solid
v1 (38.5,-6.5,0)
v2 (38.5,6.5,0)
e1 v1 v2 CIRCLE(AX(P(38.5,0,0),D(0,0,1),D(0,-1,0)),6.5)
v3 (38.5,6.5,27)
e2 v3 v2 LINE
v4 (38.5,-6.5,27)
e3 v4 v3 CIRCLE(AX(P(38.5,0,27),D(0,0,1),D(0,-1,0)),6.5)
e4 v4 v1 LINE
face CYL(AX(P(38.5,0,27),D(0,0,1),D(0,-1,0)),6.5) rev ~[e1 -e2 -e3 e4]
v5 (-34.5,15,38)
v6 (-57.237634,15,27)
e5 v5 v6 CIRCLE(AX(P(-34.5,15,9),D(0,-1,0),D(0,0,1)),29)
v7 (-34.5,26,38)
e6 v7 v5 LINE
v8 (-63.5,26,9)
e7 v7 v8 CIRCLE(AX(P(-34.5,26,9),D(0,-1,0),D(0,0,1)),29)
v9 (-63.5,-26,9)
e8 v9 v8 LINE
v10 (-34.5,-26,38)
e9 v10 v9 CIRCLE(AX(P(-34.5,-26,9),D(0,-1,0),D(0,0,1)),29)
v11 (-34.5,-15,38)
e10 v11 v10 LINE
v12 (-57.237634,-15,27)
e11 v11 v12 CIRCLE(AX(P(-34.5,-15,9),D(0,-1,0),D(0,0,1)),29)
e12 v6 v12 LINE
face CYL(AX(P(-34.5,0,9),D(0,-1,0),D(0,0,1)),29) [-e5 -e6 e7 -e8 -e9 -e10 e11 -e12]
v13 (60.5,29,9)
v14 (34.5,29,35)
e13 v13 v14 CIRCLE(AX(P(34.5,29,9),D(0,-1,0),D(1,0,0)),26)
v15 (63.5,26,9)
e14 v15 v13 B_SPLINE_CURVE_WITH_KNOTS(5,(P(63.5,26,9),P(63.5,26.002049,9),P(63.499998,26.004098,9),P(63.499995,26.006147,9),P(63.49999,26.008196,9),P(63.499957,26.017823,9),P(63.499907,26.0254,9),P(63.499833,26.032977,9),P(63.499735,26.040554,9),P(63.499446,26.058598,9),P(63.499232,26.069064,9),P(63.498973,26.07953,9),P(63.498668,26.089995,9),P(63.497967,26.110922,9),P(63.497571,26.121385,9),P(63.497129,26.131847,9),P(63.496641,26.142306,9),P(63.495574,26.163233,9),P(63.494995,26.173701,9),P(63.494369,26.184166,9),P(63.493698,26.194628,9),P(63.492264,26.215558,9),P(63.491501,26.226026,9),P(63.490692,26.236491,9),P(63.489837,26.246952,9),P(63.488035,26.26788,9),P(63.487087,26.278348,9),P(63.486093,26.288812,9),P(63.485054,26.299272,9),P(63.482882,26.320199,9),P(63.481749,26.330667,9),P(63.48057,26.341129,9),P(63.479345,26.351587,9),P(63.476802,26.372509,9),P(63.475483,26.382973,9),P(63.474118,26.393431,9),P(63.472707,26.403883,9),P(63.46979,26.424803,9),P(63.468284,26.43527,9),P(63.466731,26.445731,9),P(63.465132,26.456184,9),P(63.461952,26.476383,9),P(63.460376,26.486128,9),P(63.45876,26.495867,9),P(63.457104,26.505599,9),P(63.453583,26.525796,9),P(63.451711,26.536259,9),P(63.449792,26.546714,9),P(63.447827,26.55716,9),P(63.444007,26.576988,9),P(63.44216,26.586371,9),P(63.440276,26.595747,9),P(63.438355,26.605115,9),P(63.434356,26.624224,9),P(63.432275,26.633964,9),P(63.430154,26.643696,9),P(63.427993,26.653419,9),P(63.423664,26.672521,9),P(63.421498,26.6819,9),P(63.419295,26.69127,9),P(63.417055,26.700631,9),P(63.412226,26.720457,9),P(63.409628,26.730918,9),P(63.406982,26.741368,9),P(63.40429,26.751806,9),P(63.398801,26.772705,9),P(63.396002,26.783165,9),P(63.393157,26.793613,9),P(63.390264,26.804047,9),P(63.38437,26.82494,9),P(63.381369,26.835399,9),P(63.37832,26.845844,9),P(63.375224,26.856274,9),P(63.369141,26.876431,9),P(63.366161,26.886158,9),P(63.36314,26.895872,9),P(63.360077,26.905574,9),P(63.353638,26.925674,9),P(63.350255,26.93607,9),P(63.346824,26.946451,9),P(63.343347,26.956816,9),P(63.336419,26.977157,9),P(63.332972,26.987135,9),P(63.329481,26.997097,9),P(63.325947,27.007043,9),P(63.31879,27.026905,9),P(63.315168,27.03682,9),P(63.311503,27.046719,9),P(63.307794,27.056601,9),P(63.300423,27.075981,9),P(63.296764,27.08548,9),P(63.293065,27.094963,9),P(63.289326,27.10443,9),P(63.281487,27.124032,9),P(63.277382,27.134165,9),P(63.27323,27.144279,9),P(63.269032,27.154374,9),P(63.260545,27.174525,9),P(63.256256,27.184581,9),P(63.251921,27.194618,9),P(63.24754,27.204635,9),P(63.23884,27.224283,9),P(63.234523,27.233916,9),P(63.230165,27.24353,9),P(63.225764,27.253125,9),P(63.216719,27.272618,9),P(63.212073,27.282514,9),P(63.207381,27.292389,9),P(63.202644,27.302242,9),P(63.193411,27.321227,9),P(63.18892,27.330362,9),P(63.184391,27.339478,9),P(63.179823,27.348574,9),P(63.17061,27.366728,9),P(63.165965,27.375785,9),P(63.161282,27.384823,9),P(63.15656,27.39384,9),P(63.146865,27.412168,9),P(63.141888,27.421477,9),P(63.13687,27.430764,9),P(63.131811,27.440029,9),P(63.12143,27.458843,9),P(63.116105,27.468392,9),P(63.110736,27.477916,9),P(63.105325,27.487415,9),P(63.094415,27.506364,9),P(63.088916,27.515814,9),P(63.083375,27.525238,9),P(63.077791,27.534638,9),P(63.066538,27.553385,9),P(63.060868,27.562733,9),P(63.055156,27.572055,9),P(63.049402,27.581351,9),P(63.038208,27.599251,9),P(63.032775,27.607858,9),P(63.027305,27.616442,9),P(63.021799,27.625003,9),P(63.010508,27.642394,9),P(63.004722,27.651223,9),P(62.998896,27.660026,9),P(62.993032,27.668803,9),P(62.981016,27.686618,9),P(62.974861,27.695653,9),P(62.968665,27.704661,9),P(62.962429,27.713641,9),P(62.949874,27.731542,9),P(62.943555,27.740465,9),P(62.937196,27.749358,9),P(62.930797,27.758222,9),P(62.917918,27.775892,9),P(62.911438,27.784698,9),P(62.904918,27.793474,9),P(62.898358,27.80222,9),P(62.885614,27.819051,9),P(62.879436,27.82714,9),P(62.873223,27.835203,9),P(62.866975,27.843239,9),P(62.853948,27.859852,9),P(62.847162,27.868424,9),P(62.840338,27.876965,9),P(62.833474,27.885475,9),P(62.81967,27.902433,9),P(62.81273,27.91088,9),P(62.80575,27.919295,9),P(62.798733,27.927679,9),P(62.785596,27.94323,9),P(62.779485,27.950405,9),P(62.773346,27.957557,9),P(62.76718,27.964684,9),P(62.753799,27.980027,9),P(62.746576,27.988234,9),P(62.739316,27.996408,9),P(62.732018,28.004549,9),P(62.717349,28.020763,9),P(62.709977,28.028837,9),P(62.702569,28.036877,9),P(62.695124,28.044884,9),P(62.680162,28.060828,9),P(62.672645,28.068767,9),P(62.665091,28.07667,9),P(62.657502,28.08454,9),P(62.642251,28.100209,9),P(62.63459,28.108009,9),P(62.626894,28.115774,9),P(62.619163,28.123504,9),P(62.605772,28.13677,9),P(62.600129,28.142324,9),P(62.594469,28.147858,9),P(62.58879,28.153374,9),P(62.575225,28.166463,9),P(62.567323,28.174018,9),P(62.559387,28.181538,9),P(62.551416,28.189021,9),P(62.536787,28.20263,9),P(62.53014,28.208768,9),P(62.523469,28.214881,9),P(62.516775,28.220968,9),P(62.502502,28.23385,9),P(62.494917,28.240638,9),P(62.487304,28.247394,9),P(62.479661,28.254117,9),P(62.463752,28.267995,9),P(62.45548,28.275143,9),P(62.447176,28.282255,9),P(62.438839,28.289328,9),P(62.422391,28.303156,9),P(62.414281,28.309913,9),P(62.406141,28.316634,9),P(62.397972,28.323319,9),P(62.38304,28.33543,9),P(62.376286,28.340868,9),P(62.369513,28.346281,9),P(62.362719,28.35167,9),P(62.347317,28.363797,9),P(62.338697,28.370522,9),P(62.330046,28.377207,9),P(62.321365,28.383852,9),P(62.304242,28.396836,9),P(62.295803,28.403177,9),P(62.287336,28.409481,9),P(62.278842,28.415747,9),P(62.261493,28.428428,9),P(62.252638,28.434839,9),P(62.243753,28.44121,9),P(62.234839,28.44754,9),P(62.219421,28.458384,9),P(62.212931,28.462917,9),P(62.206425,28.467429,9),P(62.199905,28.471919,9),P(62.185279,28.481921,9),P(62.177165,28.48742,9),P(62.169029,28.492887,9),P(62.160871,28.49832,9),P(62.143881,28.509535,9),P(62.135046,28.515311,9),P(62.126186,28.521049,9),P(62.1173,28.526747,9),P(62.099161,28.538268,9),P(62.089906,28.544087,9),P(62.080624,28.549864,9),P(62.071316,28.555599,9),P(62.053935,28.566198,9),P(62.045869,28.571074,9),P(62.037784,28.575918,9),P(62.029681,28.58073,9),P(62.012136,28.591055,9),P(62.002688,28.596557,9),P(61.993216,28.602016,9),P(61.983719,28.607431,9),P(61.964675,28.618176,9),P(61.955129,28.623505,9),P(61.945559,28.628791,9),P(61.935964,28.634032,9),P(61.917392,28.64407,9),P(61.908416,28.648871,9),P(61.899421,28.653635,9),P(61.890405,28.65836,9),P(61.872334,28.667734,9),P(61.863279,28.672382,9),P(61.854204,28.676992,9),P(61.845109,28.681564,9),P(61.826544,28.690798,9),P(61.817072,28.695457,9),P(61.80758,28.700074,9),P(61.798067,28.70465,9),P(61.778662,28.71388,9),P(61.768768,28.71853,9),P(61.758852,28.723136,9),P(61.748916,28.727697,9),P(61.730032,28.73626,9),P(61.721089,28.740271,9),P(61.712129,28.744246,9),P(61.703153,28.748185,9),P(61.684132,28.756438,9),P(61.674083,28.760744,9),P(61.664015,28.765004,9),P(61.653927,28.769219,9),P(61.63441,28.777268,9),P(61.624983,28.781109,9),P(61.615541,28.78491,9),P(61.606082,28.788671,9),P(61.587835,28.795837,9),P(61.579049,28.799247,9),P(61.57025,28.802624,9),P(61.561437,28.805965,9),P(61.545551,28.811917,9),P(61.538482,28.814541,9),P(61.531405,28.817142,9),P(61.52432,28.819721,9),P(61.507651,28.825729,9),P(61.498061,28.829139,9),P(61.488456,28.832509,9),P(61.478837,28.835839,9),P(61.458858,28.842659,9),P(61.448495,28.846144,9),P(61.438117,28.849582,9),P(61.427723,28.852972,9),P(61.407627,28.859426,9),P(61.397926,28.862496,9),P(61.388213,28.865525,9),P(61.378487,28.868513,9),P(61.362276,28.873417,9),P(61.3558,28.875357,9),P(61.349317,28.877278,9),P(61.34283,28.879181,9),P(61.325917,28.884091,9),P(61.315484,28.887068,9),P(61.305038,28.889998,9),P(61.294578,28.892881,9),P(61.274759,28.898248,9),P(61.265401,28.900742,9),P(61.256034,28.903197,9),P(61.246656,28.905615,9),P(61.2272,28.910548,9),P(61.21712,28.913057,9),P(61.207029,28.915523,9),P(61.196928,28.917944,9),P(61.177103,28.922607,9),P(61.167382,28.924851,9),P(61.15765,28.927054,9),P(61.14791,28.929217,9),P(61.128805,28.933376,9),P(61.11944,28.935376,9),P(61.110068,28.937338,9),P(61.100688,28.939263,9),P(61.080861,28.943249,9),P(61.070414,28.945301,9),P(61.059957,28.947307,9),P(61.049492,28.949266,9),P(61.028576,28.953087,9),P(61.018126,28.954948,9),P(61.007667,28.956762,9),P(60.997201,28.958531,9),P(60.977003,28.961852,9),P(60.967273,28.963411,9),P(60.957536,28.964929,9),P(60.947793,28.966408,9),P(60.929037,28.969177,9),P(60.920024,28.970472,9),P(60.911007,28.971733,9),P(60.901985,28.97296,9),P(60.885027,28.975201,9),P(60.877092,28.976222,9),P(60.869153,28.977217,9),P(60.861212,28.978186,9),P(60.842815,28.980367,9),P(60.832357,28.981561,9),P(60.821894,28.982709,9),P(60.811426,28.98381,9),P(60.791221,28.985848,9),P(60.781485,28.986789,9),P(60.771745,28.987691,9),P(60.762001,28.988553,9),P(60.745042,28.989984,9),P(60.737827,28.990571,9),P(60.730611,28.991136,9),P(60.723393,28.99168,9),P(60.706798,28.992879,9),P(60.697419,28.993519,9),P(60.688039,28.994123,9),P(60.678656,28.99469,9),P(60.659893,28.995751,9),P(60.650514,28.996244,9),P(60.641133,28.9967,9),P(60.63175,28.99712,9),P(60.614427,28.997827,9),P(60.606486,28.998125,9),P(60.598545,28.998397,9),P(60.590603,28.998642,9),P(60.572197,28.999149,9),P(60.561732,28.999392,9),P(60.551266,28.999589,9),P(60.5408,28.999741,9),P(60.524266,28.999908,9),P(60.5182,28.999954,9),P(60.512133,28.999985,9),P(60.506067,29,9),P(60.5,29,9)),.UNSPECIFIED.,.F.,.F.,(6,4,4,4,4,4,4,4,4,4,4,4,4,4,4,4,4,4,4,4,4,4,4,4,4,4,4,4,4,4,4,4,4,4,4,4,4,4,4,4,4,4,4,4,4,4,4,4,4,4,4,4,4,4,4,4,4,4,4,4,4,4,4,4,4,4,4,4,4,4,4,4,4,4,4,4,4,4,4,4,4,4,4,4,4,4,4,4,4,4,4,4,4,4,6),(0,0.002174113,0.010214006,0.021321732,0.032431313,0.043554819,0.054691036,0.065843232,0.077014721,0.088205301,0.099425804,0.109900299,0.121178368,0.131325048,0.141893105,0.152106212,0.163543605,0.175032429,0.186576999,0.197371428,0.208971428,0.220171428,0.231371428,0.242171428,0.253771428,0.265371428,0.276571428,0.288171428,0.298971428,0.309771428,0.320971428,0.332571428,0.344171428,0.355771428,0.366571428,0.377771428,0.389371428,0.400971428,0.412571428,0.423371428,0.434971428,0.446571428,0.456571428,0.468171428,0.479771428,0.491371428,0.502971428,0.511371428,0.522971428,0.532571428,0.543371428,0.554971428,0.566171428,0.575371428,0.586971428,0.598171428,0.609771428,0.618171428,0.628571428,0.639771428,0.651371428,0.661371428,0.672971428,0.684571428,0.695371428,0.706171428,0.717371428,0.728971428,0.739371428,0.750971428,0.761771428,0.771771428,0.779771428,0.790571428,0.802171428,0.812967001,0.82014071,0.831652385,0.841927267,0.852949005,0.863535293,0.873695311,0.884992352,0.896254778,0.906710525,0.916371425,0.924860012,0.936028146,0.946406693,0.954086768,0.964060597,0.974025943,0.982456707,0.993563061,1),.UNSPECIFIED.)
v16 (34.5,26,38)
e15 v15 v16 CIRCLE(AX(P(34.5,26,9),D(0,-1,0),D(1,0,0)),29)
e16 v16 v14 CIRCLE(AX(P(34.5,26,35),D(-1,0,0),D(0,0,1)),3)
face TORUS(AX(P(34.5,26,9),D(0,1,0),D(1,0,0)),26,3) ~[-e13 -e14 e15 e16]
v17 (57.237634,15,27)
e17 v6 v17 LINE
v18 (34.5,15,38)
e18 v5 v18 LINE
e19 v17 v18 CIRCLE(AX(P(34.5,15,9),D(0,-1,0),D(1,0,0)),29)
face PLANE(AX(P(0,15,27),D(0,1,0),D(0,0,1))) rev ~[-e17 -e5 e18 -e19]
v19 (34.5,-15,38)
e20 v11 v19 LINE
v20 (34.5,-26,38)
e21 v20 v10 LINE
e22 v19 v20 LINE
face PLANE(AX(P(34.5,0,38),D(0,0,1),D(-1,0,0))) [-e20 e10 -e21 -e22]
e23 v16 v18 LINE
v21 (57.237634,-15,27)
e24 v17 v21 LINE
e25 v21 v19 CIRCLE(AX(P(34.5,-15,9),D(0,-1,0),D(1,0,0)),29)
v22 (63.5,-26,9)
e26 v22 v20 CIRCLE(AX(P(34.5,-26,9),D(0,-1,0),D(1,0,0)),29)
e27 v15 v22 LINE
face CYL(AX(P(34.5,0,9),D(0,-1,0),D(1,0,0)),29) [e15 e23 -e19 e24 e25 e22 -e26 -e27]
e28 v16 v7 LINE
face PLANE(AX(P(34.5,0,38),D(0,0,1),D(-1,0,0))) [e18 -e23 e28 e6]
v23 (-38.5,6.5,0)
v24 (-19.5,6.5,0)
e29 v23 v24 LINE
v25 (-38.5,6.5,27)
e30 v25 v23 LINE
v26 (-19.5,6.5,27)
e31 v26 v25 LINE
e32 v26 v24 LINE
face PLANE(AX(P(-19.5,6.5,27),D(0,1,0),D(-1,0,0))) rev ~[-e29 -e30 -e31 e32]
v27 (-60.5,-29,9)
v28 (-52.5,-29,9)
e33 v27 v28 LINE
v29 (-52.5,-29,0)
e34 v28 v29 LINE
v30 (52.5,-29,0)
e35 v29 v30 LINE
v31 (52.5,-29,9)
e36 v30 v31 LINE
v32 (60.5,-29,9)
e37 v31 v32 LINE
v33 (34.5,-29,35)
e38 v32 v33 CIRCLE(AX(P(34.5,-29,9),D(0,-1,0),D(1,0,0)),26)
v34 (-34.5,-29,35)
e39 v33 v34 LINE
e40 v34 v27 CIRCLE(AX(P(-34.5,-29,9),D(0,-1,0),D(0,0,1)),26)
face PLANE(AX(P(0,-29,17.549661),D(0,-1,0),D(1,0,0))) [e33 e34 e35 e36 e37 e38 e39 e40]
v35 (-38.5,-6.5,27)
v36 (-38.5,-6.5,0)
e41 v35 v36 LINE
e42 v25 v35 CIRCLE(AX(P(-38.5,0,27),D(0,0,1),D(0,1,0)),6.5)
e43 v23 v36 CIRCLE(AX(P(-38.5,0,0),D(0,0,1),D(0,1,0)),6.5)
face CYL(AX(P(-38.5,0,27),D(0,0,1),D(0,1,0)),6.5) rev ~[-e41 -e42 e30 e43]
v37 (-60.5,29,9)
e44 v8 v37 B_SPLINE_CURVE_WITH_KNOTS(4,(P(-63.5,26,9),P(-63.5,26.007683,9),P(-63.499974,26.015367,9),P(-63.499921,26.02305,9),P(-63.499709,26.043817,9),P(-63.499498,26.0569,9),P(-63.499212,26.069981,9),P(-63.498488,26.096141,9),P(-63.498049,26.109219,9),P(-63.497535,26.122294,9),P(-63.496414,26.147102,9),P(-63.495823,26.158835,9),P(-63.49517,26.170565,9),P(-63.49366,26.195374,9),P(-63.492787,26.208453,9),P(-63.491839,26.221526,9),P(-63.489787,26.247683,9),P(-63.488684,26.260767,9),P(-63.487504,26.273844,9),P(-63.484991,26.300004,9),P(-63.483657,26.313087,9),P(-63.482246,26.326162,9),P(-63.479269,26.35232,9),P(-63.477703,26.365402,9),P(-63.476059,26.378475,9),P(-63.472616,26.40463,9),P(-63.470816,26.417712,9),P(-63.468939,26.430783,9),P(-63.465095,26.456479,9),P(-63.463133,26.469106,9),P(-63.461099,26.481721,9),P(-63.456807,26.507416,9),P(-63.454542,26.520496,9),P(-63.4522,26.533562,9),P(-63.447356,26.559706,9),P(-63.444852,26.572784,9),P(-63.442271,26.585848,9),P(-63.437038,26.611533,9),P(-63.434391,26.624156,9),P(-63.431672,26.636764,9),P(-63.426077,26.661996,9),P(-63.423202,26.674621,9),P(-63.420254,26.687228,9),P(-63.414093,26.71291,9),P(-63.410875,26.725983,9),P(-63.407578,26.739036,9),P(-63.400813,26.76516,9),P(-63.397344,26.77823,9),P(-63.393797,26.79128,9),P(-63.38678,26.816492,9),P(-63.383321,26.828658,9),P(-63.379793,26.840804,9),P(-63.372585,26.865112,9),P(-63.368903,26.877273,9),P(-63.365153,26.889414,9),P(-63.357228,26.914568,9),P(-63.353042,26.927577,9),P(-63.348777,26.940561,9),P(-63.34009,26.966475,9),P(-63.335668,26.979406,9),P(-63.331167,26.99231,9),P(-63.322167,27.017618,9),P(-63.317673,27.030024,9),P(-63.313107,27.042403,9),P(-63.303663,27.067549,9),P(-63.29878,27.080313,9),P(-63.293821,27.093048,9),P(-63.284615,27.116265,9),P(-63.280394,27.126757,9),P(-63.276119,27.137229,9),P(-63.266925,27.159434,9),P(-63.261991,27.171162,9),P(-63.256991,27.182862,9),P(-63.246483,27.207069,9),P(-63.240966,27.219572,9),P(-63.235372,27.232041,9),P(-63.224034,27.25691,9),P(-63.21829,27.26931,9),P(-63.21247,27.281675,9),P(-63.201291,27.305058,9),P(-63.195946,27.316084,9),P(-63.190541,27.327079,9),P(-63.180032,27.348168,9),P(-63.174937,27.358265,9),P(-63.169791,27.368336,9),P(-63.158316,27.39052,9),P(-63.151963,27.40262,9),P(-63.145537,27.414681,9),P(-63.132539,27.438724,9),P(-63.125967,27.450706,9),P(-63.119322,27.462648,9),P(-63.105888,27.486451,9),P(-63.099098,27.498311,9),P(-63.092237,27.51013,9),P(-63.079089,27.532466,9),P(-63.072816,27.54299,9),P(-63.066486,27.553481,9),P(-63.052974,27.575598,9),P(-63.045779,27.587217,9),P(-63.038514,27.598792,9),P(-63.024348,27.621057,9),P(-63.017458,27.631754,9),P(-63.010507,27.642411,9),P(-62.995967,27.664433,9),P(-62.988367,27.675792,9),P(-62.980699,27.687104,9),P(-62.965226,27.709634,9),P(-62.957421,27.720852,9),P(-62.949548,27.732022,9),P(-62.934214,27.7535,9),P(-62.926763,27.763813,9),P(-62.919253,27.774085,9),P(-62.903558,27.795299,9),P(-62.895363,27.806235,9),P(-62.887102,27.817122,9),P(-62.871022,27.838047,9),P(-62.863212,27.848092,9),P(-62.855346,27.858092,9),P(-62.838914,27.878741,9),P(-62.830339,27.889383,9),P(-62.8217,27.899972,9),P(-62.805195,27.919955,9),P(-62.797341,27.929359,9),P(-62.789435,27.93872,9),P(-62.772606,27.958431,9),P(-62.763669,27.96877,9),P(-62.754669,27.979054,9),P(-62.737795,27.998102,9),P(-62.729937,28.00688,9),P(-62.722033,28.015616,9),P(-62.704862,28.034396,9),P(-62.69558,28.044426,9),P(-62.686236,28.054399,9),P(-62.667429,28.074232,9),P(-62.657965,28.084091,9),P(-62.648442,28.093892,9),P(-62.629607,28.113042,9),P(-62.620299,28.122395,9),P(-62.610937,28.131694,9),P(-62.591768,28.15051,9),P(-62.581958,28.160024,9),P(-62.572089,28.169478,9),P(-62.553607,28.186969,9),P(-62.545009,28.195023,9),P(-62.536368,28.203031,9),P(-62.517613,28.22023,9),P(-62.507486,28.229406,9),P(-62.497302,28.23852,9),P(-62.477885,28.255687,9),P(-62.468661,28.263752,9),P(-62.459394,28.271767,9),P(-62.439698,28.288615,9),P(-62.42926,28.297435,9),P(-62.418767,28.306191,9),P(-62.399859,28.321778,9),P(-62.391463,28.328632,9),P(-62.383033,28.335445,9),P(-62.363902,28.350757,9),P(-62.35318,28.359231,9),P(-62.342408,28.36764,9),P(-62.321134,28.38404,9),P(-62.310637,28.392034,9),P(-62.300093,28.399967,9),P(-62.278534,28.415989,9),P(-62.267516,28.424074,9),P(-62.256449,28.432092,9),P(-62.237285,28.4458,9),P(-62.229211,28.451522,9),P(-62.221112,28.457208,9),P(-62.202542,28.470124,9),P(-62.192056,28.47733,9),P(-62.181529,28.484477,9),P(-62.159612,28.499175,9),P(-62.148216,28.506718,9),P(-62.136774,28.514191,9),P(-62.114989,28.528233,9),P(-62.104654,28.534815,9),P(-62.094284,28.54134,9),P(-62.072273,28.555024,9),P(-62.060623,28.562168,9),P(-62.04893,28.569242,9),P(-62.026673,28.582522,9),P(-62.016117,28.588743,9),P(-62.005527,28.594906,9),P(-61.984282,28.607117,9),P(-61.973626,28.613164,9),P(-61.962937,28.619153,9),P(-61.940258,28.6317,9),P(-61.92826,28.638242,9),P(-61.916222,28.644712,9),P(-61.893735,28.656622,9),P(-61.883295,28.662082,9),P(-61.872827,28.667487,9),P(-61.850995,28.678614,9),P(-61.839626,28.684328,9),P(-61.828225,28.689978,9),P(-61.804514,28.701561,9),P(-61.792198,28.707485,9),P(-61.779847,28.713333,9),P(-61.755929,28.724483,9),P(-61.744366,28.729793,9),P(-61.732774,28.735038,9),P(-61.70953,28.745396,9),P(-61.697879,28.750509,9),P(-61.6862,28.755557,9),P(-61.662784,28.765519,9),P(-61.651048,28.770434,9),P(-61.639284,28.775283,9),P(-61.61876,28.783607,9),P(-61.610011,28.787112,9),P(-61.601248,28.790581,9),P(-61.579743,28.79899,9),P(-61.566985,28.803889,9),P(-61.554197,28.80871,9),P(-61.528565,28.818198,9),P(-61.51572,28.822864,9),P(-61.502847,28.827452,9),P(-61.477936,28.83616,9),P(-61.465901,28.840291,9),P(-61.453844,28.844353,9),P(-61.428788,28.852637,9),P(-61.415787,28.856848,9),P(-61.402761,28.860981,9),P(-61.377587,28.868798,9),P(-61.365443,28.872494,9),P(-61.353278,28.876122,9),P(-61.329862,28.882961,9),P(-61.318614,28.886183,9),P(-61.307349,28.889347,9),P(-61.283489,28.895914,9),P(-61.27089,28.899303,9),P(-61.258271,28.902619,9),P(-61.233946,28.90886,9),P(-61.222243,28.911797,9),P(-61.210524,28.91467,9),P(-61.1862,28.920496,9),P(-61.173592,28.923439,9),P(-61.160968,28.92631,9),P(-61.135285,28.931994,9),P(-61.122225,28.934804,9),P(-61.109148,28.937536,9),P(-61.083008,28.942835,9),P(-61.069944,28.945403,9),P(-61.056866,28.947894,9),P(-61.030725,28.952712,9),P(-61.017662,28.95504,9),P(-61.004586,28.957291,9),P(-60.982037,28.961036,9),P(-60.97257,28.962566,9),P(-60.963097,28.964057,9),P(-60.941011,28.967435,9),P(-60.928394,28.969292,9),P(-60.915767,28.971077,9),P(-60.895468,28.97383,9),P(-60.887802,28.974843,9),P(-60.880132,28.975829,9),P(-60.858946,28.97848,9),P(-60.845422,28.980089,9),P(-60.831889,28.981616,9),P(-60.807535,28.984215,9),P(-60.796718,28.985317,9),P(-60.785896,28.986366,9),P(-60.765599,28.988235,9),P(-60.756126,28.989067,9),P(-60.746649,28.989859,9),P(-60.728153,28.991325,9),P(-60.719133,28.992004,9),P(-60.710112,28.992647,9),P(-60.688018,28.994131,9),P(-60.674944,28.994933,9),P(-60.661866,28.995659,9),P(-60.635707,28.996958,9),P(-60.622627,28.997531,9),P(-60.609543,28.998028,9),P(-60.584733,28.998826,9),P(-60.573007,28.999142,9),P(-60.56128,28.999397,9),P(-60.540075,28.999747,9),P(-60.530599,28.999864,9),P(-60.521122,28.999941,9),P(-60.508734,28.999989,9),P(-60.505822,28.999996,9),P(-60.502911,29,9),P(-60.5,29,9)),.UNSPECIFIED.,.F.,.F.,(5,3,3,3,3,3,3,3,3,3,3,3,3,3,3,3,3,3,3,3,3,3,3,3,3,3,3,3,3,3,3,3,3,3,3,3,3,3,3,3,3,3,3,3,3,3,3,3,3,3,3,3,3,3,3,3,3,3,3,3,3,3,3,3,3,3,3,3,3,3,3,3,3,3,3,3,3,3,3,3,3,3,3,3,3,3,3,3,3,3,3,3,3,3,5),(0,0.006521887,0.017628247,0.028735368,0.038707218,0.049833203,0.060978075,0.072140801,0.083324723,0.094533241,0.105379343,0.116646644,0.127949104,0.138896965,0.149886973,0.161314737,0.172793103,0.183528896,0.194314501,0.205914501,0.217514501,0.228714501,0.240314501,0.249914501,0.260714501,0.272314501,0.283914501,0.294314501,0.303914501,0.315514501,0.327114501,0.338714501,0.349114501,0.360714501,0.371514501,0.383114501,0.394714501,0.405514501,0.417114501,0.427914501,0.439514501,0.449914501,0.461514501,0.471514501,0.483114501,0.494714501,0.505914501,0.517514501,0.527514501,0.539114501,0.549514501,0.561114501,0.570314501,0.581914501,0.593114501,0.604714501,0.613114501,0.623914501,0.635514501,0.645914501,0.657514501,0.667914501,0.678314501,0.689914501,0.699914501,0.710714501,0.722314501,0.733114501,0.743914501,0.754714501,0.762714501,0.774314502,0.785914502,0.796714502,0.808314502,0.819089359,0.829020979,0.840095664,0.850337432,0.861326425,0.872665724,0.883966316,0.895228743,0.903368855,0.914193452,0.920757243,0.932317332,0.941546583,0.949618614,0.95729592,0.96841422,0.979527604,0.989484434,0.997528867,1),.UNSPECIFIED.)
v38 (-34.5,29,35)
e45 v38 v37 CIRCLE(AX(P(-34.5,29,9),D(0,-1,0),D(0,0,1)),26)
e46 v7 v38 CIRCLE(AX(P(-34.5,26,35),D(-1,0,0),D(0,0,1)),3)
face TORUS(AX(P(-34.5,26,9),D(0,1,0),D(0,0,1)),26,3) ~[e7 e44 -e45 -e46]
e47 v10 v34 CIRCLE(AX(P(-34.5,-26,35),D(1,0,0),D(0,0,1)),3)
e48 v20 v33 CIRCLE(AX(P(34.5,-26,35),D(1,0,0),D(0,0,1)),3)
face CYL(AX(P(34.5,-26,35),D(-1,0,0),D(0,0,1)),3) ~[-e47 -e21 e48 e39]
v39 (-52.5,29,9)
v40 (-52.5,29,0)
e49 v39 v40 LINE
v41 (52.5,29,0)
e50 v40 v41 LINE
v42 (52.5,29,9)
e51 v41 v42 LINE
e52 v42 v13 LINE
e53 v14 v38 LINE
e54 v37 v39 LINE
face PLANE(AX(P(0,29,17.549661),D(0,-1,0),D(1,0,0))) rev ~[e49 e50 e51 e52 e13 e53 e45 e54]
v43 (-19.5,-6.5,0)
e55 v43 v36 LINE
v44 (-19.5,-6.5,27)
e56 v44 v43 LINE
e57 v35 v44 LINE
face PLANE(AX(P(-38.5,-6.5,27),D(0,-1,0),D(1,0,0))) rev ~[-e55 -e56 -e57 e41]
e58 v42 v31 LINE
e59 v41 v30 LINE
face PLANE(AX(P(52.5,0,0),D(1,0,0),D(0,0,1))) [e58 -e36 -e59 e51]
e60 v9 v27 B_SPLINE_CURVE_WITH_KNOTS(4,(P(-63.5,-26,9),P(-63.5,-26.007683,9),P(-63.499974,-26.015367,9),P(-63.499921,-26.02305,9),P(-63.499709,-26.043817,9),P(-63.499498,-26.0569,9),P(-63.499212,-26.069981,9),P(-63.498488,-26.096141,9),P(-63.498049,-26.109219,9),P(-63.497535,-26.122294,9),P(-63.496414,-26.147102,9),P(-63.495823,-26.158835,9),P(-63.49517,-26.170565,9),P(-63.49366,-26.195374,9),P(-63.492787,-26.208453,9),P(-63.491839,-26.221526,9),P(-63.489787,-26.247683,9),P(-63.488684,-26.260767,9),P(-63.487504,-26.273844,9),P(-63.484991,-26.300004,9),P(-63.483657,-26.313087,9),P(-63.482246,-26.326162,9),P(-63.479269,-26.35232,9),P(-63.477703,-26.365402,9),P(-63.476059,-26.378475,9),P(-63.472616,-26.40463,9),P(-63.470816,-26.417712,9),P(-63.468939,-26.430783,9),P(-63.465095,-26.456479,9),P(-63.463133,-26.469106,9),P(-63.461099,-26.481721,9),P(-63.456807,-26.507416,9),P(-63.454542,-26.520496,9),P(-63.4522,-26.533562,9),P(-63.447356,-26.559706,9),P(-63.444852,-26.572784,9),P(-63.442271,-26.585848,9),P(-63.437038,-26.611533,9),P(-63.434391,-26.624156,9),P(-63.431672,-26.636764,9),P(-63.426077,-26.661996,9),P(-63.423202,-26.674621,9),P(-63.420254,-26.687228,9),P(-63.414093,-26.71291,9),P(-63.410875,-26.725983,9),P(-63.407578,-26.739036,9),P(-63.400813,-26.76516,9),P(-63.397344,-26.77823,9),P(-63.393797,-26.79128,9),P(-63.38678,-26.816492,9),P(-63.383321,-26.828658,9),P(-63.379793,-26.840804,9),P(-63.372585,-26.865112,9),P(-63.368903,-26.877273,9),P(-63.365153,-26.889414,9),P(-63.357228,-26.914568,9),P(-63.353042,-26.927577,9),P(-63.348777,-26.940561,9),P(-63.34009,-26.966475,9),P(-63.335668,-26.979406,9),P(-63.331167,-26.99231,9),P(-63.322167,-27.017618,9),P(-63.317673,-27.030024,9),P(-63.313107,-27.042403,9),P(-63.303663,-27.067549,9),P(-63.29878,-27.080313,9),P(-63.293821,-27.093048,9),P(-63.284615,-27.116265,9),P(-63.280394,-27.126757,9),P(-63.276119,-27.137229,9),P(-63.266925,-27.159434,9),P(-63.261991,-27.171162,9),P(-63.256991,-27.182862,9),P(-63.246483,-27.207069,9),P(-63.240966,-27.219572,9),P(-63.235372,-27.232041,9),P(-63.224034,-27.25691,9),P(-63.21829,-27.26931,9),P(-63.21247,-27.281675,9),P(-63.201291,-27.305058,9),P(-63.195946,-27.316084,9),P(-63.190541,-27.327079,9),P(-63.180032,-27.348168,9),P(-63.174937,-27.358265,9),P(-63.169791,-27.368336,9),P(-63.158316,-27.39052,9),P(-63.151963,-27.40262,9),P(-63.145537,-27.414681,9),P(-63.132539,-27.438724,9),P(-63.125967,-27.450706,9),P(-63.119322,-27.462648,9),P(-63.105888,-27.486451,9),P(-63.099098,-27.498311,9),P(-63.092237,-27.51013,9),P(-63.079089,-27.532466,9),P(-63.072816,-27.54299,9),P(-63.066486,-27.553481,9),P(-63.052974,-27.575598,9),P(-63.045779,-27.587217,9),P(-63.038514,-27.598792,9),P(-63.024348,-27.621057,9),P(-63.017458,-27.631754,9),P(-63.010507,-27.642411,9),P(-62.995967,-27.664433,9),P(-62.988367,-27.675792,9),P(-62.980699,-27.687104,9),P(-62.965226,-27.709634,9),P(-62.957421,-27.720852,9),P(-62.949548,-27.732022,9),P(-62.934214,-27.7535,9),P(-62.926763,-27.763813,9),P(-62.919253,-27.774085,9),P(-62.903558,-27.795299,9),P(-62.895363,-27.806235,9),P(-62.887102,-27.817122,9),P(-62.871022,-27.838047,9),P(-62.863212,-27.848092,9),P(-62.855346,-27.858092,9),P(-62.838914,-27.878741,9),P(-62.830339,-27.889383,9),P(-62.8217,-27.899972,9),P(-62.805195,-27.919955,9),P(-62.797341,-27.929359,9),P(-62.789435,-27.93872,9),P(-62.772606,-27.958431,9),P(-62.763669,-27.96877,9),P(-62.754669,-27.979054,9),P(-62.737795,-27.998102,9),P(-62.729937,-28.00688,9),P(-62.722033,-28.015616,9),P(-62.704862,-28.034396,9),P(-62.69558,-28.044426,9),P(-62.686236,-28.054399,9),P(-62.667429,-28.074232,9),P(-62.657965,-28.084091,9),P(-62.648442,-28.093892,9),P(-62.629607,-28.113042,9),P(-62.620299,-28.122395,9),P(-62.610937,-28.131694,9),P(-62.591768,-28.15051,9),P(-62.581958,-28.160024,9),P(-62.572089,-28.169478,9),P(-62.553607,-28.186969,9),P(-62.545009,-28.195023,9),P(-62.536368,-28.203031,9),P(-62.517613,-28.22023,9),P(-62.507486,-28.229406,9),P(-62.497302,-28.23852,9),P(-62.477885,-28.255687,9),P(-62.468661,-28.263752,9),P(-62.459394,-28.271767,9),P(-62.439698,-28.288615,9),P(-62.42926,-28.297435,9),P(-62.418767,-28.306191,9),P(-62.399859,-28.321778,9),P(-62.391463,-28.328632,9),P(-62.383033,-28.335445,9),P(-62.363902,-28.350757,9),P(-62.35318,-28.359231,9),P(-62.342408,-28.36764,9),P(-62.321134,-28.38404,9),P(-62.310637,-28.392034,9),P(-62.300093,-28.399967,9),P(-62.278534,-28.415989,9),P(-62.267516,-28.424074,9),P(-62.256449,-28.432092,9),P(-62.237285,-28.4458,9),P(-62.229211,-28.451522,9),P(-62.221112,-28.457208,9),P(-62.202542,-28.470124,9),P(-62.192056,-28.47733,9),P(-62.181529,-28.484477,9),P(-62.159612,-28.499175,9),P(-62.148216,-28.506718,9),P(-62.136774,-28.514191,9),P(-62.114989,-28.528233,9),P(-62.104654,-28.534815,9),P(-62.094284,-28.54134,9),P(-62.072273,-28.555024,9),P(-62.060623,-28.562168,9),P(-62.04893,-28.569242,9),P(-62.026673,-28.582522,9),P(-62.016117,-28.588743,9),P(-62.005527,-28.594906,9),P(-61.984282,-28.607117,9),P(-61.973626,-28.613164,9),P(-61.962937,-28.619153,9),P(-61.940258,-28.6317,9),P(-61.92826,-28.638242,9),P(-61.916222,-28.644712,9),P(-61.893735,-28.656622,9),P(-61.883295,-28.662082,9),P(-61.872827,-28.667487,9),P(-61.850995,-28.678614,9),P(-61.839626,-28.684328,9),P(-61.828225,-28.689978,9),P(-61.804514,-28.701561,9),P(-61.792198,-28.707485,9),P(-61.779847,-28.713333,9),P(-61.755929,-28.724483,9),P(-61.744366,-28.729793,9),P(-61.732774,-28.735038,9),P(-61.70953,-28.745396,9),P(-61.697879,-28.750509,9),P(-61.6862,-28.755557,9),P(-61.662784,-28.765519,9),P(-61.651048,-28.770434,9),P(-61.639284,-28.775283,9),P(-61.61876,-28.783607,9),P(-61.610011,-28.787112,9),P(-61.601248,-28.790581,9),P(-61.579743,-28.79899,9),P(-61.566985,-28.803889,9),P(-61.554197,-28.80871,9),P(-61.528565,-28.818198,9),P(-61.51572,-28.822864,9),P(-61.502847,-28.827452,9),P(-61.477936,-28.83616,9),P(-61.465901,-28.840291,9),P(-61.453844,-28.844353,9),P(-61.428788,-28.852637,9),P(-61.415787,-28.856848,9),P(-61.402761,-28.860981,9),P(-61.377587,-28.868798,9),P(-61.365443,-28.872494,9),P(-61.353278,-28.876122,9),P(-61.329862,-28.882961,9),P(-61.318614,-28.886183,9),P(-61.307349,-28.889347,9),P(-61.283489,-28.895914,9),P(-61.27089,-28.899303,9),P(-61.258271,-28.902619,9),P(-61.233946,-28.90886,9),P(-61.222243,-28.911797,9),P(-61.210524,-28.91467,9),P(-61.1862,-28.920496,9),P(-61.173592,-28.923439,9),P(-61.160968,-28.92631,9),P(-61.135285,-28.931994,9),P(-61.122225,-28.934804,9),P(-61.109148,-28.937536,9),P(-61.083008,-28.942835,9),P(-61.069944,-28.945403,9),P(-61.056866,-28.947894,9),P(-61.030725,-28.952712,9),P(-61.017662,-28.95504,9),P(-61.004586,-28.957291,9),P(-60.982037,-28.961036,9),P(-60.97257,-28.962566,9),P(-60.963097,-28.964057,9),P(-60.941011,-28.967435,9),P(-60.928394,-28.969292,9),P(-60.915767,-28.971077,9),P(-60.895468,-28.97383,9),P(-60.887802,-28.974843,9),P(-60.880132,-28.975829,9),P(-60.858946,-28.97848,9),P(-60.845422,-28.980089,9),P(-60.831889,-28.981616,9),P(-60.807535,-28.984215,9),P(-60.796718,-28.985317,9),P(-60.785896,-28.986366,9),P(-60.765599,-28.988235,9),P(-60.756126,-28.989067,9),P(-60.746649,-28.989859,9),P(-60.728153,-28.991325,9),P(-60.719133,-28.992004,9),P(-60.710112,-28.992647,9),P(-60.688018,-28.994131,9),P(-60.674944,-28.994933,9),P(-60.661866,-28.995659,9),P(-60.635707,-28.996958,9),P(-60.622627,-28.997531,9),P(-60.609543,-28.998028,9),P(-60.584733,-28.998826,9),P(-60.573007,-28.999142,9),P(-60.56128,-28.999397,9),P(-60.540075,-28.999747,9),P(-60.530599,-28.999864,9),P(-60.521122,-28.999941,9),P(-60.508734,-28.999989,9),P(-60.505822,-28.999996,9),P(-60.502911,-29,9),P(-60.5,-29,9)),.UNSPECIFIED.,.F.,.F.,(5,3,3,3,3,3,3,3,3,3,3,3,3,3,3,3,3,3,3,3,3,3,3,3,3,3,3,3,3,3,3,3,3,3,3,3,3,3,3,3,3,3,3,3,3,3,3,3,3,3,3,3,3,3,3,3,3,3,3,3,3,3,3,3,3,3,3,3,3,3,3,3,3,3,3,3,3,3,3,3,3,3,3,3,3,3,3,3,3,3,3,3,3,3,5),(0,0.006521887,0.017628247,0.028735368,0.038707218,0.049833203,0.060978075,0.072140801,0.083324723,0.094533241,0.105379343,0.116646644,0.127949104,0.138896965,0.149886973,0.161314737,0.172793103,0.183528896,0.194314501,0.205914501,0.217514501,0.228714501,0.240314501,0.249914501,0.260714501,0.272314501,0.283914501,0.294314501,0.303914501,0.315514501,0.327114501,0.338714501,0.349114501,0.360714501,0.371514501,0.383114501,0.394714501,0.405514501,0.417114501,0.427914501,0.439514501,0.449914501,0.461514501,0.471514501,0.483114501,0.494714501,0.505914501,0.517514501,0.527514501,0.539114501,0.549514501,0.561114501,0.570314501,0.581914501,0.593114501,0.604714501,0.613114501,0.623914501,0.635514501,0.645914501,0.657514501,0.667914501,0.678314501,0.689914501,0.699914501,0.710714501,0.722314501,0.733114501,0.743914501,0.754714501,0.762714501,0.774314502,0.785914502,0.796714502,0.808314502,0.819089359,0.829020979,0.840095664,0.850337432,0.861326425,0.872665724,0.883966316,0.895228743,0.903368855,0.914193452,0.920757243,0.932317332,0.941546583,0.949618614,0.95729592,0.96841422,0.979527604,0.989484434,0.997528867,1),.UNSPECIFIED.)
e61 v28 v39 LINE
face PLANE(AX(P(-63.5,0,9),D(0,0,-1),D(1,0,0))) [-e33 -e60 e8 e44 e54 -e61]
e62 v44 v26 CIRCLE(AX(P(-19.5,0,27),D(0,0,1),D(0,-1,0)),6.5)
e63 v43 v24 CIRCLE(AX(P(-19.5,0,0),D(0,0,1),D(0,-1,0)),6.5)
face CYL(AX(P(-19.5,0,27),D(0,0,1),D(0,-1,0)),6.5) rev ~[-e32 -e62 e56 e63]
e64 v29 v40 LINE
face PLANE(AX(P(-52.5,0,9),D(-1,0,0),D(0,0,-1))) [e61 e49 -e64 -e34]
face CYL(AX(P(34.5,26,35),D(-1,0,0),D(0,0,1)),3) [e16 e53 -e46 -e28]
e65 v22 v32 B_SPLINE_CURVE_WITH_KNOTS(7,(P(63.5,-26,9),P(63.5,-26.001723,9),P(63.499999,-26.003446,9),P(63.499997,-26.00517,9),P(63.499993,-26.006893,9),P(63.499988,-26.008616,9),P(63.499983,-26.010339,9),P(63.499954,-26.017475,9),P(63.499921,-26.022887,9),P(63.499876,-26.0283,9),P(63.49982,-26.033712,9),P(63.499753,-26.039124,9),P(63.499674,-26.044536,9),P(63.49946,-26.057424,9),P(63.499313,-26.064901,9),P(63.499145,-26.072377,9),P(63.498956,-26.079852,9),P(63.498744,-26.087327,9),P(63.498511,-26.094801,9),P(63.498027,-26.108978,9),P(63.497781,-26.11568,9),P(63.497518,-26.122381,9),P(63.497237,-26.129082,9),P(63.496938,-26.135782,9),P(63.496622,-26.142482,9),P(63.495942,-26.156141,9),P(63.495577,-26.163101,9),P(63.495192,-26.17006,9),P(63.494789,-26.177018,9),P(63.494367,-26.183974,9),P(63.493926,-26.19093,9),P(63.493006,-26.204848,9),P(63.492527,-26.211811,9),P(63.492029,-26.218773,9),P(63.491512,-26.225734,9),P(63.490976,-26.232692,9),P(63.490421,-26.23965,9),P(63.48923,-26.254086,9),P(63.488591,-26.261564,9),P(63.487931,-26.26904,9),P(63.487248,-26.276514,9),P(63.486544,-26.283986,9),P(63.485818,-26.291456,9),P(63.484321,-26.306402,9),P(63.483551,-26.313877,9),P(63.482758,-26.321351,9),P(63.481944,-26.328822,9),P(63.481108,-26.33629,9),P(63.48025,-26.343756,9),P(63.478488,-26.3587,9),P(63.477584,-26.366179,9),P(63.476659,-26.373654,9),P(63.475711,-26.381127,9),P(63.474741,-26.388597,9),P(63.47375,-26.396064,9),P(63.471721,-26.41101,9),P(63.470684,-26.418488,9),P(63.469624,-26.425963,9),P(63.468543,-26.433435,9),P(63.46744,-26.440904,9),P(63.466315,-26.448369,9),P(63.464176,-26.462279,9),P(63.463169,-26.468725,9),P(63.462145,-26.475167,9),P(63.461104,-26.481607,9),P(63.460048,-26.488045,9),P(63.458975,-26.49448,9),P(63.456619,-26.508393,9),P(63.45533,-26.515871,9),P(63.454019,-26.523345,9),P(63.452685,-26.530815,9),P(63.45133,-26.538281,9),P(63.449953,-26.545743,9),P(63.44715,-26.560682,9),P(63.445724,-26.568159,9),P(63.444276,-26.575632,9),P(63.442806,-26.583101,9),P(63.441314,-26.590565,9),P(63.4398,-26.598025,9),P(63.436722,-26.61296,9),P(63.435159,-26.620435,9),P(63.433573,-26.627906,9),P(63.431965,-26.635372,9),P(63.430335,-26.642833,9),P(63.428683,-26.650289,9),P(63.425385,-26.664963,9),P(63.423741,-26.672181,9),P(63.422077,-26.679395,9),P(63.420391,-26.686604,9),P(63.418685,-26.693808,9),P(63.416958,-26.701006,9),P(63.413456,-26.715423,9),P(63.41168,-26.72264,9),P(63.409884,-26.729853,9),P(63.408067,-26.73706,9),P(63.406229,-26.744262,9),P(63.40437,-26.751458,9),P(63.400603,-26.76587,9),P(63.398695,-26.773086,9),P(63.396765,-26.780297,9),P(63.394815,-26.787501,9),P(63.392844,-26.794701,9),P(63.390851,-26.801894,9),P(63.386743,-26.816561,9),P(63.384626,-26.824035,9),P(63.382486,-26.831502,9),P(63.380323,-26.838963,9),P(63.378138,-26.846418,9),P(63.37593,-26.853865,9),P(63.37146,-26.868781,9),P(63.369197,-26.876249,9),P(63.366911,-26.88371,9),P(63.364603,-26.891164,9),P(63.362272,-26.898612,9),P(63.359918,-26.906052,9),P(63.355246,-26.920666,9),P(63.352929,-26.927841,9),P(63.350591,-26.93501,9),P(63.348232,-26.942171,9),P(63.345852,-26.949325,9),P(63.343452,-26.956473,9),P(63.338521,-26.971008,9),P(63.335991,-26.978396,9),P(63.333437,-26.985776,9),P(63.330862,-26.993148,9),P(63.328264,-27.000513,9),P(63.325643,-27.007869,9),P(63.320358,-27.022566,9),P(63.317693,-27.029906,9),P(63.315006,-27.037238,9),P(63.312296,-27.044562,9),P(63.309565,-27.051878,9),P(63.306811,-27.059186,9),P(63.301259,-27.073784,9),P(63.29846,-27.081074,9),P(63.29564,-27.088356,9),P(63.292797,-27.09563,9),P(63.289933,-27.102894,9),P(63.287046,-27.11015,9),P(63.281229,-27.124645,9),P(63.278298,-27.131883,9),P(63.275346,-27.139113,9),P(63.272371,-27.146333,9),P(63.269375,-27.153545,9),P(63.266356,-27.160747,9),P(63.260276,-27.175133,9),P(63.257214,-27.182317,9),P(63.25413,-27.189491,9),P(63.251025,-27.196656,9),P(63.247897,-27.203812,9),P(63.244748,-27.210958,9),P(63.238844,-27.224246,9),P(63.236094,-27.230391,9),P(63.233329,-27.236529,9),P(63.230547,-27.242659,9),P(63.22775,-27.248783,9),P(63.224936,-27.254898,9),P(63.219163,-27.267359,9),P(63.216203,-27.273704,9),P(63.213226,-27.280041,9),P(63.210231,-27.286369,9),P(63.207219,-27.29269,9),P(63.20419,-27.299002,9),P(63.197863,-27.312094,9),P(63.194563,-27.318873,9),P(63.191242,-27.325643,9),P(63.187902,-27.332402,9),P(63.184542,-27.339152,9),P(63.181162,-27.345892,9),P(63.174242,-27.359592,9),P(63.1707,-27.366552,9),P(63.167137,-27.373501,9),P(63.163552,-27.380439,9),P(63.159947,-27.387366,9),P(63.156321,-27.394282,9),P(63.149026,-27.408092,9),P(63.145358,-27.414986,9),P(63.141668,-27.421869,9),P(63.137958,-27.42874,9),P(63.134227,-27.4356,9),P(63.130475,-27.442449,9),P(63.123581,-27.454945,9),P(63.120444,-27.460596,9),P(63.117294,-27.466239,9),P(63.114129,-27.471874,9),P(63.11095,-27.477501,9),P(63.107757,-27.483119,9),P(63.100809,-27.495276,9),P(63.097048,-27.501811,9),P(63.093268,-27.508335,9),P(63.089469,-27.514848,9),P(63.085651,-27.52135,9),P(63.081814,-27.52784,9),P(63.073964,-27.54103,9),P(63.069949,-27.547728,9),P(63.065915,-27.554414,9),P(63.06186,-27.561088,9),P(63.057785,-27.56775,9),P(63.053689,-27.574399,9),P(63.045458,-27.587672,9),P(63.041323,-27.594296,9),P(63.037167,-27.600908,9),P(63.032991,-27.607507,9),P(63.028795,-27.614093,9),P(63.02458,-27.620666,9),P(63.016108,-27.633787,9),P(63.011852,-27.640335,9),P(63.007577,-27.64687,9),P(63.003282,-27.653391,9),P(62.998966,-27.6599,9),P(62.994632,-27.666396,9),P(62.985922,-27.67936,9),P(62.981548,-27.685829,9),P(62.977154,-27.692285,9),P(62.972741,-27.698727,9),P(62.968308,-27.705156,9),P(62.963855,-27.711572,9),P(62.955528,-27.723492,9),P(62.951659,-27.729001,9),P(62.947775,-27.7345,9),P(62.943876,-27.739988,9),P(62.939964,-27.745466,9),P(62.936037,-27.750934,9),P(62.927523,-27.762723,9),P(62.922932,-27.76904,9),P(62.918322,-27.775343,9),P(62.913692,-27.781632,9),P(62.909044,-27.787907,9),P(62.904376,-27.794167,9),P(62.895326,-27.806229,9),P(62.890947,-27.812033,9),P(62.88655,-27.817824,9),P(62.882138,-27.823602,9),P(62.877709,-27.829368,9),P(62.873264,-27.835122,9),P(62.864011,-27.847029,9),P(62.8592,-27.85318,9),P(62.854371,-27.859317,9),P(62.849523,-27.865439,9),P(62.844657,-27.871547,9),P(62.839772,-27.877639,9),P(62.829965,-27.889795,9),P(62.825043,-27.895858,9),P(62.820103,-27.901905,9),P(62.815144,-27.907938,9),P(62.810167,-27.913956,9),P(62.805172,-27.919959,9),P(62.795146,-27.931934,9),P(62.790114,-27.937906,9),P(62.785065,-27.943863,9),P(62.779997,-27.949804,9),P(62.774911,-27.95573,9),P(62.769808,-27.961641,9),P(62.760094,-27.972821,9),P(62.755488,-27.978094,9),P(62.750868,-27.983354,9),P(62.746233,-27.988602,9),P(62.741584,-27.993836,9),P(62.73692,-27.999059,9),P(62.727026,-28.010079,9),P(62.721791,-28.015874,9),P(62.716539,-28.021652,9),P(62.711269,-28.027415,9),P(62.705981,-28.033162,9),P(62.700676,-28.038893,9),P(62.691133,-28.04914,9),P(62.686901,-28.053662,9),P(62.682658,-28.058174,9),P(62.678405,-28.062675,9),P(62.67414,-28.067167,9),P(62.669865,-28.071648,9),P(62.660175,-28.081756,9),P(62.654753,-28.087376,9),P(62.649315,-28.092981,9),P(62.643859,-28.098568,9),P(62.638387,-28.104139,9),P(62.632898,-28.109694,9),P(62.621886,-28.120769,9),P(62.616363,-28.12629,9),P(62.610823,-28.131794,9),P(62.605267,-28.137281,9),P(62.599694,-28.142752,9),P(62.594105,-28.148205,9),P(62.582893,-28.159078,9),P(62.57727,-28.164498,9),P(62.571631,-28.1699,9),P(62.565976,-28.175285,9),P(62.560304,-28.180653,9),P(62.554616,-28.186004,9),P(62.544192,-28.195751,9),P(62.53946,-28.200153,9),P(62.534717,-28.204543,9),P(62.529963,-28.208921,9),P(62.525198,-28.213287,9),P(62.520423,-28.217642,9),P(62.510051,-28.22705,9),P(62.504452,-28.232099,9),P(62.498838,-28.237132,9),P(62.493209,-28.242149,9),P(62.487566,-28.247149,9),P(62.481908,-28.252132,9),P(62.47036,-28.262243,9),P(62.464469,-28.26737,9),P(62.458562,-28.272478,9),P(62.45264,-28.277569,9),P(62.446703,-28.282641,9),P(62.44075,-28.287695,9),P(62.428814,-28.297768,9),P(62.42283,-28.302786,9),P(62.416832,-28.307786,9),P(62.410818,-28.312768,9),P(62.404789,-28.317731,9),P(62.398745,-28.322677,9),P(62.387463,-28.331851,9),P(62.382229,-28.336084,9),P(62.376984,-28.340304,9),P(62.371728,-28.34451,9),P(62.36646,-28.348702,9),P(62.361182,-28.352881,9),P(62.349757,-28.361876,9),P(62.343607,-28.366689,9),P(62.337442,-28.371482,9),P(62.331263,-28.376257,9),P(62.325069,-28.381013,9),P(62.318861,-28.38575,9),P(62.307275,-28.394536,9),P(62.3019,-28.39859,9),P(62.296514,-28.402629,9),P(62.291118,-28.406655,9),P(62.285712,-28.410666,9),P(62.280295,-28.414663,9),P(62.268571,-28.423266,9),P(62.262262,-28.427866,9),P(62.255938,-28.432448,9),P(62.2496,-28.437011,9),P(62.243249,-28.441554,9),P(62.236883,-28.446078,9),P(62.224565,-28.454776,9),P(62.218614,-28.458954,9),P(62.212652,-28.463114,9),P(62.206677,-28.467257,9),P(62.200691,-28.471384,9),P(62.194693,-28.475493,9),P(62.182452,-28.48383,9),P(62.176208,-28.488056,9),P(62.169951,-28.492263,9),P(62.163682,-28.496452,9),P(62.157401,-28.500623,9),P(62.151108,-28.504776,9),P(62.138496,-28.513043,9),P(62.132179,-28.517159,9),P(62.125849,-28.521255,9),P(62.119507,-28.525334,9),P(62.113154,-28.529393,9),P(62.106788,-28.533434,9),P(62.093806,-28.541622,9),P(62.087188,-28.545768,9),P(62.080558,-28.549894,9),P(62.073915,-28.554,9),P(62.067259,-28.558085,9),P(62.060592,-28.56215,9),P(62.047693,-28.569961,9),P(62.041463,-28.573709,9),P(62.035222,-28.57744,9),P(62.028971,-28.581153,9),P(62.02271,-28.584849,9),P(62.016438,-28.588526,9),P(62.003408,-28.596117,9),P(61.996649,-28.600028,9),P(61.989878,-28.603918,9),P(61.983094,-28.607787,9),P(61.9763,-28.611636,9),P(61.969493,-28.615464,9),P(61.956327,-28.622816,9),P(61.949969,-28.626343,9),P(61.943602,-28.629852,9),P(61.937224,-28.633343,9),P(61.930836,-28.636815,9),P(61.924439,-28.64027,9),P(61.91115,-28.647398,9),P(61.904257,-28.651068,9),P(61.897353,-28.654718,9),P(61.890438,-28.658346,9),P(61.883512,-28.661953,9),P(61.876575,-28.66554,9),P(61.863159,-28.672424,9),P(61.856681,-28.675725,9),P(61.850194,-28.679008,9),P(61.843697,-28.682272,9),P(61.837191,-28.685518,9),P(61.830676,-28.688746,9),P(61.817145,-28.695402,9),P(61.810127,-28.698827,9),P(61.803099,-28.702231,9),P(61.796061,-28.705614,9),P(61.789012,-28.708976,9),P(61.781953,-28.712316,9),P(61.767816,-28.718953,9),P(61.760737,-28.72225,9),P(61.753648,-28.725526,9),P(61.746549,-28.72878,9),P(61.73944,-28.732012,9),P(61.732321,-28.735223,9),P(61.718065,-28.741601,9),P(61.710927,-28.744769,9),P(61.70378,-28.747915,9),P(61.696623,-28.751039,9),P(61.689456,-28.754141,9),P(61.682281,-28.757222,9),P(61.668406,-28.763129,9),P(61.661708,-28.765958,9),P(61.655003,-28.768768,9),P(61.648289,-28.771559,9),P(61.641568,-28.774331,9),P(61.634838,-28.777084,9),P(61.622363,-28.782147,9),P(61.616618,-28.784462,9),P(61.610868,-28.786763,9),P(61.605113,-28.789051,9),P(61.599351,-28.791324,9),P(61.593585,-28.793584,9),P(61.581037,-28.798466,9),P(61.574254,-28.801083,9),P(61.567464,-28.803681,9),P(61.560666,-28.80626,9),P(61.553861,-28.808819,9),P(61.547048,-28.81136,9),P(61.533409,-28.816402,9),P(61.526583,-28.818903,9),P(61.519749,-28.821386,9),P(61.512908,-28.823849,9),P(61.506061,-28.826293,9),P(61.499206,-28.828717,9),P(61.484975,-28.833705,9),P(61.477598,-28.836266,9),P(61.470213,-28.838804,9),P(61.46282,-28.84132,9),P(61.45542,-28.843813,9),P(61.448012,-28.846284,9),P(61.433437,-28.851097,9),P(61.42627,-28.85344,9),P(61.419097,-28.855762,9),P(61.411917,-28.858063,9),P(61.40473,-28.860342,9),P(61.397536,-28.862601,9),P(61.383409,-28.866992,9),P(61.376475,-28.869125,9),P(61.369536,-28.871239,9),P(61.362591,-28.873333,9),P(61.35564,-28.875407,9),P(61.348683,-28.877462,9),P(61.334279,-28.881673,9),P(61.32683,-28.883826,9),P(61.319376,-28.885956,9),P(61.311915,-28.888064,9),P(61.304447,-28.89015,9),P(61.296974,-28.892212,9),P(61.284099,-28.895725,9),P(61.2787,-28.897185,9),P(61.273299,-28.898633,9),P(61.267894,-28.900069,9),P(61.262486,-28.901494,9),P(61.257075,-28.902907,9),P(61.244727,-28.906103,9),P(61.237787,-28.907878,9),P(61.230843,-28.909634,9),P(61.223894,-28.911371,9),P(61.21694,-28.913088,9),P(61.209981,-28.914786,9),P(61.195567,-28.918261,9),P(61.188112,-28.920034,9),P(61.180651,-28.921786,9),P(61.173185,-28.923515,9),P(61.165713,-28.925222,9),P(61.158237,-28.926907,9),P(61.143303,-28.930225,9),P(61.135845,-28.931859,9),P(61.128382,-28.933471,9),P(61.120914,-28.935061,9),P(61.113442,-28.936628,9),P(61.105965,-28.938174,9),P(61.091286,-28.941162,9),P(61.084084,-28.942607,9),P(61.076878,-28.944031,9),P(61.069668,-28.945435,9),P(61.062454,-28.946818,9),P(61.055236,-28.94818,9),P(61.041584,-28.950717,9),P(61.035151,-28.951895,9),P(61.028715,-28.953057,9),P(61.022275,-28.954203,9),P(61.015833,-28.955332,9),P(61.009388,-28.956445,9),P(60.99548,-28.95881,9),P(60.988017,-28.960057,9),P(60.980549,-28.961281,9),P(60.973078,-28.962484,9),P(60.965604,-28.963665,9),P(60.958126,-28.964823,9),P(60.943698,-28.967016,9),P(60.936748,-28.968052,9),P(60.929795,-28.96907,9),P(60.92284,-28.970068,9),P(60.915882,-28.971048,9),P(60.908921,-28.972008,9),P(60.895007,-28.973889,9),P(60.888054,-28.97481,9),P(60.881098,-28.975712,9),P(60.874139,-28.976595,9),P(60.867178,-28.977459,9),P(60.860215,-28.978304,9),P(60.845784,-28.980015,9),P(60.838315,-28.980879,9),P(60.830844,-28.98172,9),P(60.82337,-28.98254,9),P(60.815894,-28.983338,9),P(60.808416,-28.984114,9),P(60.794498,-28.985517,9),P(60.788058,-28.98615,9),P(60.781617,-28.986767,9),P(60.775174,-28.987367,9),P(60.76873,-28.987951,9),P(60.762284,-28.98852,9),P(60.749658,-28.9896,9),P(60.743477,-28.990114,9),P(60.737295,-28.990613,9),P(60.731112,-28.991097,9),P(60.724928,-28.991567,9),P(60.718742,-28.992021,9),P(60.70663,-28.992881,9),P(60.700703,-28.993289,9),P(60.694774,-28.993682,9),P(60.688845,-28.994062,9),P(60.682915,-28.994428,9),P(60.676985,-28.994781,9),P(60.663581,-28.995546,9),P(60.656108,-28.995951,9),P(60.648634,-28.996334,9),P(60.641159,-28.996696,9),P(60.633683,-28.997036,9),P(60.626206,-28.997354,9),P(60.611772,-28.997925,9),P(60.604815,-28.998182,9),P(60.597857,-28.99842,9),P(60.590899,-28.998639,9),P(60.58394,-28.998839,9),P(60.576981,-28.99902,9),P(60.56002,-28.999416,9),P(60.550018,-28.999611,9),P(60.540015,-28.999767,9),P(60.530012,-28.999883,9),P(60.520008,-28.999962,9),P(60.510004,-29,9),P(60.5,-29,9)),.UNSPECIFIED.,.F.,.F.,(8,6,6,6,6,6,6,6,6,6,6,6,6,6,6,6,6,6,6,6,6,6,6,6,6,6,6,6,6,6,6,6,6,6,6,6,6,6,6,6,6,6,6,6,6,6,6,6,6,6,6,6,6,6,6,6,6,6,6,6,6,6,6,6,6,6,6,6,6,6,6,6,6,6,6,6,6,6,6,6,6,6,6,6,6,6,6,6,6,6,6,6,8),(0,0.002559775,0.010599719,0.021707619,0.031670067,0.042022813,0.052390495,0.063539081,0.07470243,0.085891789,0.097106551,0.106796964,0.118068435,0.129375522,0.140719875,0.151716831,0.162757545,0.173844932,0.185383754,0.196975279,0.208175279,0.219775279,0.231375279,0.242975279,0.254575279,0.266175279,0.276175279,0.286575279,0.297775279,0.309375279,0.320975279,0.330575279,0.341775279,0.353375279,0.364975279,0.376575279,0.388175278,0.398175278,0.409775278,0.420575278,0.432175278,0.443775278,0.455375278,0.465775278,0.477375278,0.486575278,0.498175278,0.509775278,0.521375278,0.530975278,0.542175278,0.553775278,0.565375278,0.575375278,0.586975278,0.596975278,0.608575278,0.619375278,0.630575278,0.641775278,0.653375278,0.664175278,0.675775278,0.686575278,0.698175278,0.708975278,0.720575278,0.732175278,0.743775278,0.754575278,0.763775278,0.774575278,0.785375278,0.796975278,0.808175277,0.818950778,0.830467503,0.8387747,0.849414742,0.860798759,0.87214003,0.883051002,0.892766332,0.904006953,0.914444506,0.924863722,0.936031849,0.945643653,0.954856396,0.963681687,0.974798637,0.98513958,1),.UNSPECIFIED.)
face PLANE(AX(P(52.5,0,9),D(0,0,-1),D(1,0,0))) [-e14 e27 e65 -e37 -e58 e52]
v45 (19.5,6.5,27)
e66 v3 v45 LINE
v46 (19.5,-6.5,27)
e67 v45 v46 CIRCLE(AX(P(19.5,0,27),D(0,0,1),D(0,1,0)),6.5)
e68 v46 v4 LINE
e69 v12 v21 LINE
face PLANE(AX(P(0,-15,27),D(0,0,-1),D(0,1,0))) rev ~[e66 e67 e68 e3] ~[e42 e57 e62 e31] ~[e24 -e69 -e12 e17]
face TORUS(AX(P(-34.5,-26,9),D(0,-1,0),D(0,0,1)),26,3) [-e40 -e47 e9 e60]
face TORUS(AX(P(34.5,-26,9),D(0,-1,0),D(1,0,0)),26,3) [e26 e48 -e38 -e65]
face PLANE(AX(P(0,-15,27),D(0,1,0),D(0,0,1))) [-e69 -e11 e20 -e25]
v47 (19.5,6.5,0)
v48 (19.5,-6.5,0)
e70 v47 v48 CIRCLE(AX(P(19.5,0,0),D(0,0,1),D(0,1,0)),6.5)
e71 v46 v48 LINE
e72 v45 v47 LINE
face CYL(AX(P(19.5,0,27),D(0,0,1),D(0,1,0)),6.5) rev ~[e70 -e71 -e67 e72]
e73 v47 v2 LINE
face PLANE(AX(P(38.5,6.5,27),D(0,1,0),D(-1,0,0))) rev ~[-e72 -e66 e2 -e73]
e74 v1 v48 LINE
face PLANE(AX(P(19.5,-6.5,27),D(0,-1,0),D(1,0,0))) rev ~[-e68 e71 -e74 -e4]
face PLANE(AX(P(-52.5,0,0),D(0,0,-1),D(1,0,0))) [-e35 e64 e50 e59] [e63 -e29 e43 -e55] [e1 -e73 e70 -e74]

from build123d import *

# Parameters (mm, degrees)
F1_DEPTH      = 29
F2_R          = 3
F3_W          = 30
F3_H          = 11
F4_DEPTH      = 63.5010001
F4_DEPTH_BACK = 63.5010001
F6_DEPTH      = 27.001


with BuildPart() as f1:
    # F0 (on Front) → F1 (new body, symmetric)
    with BuildSketch(Plane.XZ):
        with BuildLine():
            Line((-52.5, 0), (52.5, 0))
            Line((52.5, 0), (52.5, 9))
            Line((52.5, 9), (63.5, 9))
            ThreePointArc((63.5, 9), (55.0060966544, 29.5060966544), (34.5, 38))
            Line((34.5, 38), (-34.5, 38))
            ThreePointArc((-34.5, 38), (-55.0060966544, 29.5060966544), (-63.5, 9))
            Line((-63.5, 9), (-52.5, 9))
            Line((-52.5, 9), (-52.5, 0))
        make_face()
    extrude(amount=F1_DEPTH, both=True)

    # F2
    f2_edges = [f1.edges().sort_by_distance(p)[0] for p in [
        (0, -29, 38),
        (0, 29, 38),
    ]]
    fillet(f2_edges, radius=F2_R)

    # F3 (on Right) → F4 (cut, two sides)
    with BuildSketch(Plane.YZ) as f4_sk:
        with Locations((0, 32.5)):
            Rectangle(F3_W, F3_H)
    extrude(amount=-F4_DEPTH, mode=Mode.SUBTRACT)
    extrude(f4_sk.sketch, amount=F4_DEPTH_BACK, mode=Mode.SUBTRACT)

    # F5 (on face) → F6 (cut, through all)
    with BuildSketch(Plane.XY.offset(27)):
        with BuildLine():
            Line((-19.5, 6.5), (-38.5, 6.5))
            ThreePointArc((-38.5, 6.5), (-45, 0), (-38.5, -6.5))
            Line((-38.5, -6.5), (-19.5, -6.5))
            ThreePointArc((-19.5, -6.5), (-13, 0), (-19.5, 6.5))
        make_face()
        with BuildLine():
            Line((38.5, 6.5), (19.5, 6.5))
            ThreePointArc((19.5, 6.5), (13, 0), (19.5, -6.5))
            Line((19.5, -6.5), (38.5, -6.5))
            ThreePointArc((38.5, -6.5), (45, 0), (38.5, 6.5))
        make_face()
    extrude(amount=-F6_DEPTH, mode=Mode.SUBTRACT)


solid = f1.part
